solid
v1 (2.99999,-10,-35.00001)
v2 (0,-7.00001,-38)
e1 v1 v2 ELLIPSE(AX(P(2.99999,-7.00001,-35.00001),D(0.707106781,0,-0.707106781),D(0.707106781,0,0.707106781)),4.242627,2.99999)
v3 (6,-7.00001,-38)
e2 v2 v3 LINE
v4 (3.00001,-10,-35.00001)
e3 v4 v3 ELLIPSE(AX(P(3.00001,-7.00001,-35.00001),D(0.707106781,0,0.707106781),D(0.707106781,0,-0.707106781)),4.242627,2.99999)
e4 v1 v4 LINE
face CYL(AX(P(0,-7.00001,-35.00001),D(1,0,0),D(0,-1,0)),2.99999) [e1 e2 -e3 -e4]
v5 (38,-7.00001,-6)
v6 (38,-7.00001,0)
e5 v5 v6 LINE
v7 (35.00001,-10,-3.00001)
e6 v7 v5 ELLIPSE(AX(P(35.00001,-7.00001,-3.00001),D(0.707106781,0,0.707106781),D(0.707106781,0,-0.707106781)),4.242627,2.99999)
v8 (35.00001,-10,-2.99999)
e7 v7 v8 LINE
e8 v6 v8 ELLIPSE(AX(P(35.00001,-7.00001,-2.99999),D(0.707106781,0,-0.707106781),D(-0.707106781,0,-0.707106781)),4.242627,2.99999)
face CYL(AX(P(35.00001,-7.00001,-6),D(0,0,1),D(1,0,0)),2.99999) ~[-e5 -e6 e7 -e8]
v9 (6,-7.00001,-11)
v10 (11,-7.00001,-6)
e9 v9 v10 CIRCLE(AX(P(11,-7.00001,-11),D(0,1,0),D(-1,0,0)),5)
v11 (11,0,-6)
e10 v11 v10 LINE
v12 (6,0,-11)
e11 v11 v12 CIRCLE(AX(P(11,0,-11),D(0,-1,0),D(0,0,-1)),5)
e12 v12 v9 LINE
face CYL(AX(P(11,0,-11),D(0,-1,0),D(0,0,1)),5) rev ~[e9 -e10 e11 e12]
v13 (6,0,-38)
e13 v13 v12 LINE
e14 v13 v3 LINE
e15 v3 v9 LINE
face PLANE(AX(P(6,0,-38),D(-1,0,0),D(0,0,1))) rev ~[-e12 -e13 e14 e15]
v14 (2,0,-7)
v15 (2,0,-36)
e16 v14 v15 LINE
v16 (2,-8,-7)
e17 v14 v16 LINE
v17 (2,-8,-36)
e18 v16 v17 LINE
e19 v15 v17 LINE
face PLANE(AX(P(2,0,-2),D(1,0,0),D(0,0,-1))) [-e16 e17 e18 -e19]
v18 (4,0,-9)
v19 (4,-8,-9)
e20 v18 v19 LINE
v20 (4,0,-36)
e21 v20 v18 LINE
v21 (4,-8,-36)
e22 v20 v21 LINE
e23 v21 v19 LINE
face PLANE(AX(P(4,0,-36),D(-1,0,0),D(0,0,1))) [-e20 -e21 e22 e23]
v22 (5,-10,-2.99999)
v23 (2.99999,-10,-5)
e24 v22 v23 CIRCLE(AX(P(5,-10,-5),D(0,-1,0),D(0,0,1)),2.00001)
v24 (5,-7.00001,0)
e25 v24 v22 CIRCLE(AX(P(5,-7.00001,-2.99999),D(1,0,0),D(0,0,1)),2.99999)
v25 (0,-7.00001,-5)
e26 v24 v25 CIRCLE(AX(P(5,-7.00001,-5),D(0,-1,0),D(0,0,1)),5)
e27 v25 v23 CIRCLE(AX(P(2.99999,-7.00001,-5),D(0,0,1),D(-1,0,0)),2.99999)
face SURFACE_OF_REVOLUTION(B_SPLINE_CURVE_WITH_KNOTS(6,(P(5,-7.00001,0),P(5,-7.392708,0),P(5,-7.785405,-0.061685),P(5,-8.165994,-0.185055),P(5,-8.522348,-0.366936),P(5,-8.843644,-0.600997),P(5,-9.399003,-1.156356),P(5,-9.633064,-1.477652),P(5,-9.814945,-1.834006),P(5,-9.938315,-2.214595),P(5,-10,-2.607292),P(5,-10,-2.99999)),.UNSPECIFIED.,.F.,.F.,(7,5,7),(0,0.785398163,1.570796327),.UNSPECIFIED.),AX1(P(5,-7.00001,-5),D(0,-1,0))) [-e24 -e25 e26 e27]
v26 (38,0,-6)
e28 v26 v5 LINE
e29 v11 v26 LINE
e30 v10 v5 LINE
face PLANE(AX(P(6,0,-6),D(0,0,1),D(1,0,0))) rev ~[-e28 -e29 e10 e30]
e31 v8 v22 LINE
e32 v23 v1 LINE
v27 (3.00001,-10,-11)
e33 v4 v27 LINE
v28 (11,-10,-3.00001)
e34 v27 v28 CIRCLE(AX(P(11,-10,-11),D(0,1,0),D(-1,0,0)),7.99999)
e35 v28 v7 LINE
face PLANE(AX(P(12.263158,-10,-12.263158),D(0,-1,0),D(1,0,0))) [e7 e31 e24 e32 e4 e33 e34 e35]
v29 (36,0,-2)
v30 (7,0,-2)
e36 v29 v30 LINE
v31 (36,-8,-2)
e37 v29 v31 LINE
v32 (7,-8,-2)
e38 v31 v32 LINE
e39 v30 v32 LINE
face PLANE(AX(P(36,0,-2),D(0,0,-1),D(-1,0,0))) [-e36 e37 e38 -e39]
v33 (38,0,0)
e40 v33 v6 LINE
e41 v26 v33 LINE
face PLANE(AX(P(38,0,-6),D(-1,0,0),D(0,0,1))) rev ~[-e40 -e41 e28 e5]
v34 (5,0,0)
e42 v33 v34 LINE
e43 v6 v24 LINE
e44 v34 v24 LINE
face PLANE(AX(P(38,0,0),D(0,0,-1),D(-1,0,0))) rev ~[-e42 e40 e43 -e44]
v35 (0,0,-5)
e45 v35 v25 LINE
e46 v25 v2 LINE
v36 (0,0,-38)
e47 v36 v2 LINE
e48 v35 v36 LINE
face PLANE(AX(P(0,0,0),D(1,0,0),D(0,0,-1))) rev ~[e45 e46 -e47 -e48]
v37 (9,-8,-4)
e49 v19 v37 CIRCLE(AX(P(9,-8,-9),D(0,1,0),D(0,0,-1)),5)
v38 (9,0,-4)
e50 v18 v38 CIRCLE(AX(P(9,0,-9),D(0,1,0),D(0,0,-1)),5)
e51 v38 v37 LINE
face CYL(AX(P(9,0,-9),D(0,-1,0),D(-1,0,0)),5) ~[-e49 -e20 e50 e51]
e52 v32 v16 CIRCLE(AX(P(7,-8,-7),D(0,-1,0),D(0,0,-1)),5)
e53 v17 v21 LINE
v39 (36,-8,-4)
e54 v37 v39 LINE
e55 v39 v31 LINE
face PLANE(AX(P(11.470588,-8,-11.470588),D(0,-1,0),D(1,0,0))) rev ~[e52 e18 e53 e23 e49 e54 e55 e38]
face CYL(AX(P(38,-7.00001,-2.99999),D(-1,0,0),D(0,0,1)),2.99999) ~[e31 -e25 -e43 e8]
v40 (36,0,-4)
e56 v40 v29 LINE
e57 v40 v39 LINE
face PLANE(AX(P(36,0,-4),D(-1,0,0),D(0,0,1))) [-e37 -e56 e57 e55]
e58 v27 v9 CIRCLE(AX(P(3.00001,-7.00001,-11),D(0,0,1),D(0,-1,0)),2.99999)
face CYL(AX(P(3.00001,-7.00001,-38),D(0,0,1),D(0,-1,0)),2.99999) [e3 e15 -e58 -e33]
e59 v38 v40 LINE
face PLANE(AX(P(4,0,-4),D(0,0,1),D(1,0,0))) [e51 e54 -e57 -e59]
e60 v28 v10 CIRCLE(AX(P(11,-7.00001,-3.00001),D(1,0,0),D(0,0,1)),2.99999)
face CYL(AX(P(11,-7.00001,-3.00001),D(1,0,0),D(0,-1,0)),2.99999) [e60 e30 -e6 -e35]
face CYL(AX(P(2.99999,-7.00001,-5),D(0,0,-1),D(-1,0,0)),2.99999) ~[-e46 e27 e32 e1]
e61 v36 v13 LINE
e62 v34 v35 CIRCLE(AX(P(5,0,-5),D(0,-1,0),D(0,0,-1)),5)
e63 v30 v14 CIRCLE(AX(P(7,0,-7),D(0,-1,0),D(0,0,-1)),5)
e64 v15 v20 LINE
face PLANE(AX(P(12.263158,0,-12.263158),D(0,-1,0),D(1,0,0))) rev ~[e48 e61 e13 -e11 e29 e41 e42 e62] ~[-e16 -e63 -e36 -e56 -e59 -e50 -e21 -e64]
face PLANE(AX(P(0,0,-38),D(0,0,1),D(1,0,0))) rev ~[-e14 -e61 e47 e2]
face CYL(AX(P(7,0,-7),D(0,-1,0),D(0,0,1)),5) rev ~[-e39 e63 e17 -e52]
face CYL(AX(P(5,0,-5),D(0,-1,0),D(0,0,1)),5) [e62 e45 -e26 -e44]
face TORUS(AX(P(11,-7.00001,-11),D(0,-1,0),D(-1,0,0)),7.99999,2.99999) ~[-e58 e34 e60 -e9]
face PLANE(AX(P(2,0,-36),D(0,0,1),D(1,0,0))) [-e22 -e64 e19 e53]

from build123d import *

# Parameters (mm, degrees)
F1_DEPTH      = 10
F3_DEPTH      = 10
F3_DEPTH_BACK = 8
F4_R          = 5
F5_R          = 2.99999


# Not quite as in the source:
# - a fillet or chamfer is up to 0.001 mm smaller than in the source, because OpenCascade refuses the exact size


with BuildPart() as f1:
    # F0 (on Front) → F1 (new body)
    with BuildSketch(Plane.XZ):
        Polygon((38, 0), (0, 0), (0, -38), (6, -38), (6, -6), (38, -6), align=None)
    extrude(amount=F1_DEPTH)

    # F2 (on Front) → F3 (cut, two sides)
    with BuildSketch(Plane.XZ) as f3_sk:
        Polygon((36, -2), (2, -2), (2, -36), (4, -36), (4, -4), (36, -4), align=None)
    extrude(amount=-F3_DEPTH, mode=Mode.SUBTRACT)
    extrude(f3_sk.sketch, amount=F3_DEPTH_BACK, mode=Mode.SUBTRACT)

    # F4
    f4_edges = [f1.edges().sort_by_distance(p)[0] for p in [
        (0, -5, 0),
        (4, -4, -4),
        (2, -4, -2),
        (6, -5, -6),
    ]]
    fillet(f4_edges, radius=F4_R)

    # F5 (radius 3 in the source; OpenCascade refuses exactly that, so slightly less here)
    f5_edges = [f1.edges().sort_by_distance(p)[0] for p in [
        (3, -10, -38),
        (6, -10, -24.5),
        (21.5, -10, 0),
        (38, -10, -3),
    ]]
    fillet(f5_edges, radius=F5_R)


solid = f1.part
